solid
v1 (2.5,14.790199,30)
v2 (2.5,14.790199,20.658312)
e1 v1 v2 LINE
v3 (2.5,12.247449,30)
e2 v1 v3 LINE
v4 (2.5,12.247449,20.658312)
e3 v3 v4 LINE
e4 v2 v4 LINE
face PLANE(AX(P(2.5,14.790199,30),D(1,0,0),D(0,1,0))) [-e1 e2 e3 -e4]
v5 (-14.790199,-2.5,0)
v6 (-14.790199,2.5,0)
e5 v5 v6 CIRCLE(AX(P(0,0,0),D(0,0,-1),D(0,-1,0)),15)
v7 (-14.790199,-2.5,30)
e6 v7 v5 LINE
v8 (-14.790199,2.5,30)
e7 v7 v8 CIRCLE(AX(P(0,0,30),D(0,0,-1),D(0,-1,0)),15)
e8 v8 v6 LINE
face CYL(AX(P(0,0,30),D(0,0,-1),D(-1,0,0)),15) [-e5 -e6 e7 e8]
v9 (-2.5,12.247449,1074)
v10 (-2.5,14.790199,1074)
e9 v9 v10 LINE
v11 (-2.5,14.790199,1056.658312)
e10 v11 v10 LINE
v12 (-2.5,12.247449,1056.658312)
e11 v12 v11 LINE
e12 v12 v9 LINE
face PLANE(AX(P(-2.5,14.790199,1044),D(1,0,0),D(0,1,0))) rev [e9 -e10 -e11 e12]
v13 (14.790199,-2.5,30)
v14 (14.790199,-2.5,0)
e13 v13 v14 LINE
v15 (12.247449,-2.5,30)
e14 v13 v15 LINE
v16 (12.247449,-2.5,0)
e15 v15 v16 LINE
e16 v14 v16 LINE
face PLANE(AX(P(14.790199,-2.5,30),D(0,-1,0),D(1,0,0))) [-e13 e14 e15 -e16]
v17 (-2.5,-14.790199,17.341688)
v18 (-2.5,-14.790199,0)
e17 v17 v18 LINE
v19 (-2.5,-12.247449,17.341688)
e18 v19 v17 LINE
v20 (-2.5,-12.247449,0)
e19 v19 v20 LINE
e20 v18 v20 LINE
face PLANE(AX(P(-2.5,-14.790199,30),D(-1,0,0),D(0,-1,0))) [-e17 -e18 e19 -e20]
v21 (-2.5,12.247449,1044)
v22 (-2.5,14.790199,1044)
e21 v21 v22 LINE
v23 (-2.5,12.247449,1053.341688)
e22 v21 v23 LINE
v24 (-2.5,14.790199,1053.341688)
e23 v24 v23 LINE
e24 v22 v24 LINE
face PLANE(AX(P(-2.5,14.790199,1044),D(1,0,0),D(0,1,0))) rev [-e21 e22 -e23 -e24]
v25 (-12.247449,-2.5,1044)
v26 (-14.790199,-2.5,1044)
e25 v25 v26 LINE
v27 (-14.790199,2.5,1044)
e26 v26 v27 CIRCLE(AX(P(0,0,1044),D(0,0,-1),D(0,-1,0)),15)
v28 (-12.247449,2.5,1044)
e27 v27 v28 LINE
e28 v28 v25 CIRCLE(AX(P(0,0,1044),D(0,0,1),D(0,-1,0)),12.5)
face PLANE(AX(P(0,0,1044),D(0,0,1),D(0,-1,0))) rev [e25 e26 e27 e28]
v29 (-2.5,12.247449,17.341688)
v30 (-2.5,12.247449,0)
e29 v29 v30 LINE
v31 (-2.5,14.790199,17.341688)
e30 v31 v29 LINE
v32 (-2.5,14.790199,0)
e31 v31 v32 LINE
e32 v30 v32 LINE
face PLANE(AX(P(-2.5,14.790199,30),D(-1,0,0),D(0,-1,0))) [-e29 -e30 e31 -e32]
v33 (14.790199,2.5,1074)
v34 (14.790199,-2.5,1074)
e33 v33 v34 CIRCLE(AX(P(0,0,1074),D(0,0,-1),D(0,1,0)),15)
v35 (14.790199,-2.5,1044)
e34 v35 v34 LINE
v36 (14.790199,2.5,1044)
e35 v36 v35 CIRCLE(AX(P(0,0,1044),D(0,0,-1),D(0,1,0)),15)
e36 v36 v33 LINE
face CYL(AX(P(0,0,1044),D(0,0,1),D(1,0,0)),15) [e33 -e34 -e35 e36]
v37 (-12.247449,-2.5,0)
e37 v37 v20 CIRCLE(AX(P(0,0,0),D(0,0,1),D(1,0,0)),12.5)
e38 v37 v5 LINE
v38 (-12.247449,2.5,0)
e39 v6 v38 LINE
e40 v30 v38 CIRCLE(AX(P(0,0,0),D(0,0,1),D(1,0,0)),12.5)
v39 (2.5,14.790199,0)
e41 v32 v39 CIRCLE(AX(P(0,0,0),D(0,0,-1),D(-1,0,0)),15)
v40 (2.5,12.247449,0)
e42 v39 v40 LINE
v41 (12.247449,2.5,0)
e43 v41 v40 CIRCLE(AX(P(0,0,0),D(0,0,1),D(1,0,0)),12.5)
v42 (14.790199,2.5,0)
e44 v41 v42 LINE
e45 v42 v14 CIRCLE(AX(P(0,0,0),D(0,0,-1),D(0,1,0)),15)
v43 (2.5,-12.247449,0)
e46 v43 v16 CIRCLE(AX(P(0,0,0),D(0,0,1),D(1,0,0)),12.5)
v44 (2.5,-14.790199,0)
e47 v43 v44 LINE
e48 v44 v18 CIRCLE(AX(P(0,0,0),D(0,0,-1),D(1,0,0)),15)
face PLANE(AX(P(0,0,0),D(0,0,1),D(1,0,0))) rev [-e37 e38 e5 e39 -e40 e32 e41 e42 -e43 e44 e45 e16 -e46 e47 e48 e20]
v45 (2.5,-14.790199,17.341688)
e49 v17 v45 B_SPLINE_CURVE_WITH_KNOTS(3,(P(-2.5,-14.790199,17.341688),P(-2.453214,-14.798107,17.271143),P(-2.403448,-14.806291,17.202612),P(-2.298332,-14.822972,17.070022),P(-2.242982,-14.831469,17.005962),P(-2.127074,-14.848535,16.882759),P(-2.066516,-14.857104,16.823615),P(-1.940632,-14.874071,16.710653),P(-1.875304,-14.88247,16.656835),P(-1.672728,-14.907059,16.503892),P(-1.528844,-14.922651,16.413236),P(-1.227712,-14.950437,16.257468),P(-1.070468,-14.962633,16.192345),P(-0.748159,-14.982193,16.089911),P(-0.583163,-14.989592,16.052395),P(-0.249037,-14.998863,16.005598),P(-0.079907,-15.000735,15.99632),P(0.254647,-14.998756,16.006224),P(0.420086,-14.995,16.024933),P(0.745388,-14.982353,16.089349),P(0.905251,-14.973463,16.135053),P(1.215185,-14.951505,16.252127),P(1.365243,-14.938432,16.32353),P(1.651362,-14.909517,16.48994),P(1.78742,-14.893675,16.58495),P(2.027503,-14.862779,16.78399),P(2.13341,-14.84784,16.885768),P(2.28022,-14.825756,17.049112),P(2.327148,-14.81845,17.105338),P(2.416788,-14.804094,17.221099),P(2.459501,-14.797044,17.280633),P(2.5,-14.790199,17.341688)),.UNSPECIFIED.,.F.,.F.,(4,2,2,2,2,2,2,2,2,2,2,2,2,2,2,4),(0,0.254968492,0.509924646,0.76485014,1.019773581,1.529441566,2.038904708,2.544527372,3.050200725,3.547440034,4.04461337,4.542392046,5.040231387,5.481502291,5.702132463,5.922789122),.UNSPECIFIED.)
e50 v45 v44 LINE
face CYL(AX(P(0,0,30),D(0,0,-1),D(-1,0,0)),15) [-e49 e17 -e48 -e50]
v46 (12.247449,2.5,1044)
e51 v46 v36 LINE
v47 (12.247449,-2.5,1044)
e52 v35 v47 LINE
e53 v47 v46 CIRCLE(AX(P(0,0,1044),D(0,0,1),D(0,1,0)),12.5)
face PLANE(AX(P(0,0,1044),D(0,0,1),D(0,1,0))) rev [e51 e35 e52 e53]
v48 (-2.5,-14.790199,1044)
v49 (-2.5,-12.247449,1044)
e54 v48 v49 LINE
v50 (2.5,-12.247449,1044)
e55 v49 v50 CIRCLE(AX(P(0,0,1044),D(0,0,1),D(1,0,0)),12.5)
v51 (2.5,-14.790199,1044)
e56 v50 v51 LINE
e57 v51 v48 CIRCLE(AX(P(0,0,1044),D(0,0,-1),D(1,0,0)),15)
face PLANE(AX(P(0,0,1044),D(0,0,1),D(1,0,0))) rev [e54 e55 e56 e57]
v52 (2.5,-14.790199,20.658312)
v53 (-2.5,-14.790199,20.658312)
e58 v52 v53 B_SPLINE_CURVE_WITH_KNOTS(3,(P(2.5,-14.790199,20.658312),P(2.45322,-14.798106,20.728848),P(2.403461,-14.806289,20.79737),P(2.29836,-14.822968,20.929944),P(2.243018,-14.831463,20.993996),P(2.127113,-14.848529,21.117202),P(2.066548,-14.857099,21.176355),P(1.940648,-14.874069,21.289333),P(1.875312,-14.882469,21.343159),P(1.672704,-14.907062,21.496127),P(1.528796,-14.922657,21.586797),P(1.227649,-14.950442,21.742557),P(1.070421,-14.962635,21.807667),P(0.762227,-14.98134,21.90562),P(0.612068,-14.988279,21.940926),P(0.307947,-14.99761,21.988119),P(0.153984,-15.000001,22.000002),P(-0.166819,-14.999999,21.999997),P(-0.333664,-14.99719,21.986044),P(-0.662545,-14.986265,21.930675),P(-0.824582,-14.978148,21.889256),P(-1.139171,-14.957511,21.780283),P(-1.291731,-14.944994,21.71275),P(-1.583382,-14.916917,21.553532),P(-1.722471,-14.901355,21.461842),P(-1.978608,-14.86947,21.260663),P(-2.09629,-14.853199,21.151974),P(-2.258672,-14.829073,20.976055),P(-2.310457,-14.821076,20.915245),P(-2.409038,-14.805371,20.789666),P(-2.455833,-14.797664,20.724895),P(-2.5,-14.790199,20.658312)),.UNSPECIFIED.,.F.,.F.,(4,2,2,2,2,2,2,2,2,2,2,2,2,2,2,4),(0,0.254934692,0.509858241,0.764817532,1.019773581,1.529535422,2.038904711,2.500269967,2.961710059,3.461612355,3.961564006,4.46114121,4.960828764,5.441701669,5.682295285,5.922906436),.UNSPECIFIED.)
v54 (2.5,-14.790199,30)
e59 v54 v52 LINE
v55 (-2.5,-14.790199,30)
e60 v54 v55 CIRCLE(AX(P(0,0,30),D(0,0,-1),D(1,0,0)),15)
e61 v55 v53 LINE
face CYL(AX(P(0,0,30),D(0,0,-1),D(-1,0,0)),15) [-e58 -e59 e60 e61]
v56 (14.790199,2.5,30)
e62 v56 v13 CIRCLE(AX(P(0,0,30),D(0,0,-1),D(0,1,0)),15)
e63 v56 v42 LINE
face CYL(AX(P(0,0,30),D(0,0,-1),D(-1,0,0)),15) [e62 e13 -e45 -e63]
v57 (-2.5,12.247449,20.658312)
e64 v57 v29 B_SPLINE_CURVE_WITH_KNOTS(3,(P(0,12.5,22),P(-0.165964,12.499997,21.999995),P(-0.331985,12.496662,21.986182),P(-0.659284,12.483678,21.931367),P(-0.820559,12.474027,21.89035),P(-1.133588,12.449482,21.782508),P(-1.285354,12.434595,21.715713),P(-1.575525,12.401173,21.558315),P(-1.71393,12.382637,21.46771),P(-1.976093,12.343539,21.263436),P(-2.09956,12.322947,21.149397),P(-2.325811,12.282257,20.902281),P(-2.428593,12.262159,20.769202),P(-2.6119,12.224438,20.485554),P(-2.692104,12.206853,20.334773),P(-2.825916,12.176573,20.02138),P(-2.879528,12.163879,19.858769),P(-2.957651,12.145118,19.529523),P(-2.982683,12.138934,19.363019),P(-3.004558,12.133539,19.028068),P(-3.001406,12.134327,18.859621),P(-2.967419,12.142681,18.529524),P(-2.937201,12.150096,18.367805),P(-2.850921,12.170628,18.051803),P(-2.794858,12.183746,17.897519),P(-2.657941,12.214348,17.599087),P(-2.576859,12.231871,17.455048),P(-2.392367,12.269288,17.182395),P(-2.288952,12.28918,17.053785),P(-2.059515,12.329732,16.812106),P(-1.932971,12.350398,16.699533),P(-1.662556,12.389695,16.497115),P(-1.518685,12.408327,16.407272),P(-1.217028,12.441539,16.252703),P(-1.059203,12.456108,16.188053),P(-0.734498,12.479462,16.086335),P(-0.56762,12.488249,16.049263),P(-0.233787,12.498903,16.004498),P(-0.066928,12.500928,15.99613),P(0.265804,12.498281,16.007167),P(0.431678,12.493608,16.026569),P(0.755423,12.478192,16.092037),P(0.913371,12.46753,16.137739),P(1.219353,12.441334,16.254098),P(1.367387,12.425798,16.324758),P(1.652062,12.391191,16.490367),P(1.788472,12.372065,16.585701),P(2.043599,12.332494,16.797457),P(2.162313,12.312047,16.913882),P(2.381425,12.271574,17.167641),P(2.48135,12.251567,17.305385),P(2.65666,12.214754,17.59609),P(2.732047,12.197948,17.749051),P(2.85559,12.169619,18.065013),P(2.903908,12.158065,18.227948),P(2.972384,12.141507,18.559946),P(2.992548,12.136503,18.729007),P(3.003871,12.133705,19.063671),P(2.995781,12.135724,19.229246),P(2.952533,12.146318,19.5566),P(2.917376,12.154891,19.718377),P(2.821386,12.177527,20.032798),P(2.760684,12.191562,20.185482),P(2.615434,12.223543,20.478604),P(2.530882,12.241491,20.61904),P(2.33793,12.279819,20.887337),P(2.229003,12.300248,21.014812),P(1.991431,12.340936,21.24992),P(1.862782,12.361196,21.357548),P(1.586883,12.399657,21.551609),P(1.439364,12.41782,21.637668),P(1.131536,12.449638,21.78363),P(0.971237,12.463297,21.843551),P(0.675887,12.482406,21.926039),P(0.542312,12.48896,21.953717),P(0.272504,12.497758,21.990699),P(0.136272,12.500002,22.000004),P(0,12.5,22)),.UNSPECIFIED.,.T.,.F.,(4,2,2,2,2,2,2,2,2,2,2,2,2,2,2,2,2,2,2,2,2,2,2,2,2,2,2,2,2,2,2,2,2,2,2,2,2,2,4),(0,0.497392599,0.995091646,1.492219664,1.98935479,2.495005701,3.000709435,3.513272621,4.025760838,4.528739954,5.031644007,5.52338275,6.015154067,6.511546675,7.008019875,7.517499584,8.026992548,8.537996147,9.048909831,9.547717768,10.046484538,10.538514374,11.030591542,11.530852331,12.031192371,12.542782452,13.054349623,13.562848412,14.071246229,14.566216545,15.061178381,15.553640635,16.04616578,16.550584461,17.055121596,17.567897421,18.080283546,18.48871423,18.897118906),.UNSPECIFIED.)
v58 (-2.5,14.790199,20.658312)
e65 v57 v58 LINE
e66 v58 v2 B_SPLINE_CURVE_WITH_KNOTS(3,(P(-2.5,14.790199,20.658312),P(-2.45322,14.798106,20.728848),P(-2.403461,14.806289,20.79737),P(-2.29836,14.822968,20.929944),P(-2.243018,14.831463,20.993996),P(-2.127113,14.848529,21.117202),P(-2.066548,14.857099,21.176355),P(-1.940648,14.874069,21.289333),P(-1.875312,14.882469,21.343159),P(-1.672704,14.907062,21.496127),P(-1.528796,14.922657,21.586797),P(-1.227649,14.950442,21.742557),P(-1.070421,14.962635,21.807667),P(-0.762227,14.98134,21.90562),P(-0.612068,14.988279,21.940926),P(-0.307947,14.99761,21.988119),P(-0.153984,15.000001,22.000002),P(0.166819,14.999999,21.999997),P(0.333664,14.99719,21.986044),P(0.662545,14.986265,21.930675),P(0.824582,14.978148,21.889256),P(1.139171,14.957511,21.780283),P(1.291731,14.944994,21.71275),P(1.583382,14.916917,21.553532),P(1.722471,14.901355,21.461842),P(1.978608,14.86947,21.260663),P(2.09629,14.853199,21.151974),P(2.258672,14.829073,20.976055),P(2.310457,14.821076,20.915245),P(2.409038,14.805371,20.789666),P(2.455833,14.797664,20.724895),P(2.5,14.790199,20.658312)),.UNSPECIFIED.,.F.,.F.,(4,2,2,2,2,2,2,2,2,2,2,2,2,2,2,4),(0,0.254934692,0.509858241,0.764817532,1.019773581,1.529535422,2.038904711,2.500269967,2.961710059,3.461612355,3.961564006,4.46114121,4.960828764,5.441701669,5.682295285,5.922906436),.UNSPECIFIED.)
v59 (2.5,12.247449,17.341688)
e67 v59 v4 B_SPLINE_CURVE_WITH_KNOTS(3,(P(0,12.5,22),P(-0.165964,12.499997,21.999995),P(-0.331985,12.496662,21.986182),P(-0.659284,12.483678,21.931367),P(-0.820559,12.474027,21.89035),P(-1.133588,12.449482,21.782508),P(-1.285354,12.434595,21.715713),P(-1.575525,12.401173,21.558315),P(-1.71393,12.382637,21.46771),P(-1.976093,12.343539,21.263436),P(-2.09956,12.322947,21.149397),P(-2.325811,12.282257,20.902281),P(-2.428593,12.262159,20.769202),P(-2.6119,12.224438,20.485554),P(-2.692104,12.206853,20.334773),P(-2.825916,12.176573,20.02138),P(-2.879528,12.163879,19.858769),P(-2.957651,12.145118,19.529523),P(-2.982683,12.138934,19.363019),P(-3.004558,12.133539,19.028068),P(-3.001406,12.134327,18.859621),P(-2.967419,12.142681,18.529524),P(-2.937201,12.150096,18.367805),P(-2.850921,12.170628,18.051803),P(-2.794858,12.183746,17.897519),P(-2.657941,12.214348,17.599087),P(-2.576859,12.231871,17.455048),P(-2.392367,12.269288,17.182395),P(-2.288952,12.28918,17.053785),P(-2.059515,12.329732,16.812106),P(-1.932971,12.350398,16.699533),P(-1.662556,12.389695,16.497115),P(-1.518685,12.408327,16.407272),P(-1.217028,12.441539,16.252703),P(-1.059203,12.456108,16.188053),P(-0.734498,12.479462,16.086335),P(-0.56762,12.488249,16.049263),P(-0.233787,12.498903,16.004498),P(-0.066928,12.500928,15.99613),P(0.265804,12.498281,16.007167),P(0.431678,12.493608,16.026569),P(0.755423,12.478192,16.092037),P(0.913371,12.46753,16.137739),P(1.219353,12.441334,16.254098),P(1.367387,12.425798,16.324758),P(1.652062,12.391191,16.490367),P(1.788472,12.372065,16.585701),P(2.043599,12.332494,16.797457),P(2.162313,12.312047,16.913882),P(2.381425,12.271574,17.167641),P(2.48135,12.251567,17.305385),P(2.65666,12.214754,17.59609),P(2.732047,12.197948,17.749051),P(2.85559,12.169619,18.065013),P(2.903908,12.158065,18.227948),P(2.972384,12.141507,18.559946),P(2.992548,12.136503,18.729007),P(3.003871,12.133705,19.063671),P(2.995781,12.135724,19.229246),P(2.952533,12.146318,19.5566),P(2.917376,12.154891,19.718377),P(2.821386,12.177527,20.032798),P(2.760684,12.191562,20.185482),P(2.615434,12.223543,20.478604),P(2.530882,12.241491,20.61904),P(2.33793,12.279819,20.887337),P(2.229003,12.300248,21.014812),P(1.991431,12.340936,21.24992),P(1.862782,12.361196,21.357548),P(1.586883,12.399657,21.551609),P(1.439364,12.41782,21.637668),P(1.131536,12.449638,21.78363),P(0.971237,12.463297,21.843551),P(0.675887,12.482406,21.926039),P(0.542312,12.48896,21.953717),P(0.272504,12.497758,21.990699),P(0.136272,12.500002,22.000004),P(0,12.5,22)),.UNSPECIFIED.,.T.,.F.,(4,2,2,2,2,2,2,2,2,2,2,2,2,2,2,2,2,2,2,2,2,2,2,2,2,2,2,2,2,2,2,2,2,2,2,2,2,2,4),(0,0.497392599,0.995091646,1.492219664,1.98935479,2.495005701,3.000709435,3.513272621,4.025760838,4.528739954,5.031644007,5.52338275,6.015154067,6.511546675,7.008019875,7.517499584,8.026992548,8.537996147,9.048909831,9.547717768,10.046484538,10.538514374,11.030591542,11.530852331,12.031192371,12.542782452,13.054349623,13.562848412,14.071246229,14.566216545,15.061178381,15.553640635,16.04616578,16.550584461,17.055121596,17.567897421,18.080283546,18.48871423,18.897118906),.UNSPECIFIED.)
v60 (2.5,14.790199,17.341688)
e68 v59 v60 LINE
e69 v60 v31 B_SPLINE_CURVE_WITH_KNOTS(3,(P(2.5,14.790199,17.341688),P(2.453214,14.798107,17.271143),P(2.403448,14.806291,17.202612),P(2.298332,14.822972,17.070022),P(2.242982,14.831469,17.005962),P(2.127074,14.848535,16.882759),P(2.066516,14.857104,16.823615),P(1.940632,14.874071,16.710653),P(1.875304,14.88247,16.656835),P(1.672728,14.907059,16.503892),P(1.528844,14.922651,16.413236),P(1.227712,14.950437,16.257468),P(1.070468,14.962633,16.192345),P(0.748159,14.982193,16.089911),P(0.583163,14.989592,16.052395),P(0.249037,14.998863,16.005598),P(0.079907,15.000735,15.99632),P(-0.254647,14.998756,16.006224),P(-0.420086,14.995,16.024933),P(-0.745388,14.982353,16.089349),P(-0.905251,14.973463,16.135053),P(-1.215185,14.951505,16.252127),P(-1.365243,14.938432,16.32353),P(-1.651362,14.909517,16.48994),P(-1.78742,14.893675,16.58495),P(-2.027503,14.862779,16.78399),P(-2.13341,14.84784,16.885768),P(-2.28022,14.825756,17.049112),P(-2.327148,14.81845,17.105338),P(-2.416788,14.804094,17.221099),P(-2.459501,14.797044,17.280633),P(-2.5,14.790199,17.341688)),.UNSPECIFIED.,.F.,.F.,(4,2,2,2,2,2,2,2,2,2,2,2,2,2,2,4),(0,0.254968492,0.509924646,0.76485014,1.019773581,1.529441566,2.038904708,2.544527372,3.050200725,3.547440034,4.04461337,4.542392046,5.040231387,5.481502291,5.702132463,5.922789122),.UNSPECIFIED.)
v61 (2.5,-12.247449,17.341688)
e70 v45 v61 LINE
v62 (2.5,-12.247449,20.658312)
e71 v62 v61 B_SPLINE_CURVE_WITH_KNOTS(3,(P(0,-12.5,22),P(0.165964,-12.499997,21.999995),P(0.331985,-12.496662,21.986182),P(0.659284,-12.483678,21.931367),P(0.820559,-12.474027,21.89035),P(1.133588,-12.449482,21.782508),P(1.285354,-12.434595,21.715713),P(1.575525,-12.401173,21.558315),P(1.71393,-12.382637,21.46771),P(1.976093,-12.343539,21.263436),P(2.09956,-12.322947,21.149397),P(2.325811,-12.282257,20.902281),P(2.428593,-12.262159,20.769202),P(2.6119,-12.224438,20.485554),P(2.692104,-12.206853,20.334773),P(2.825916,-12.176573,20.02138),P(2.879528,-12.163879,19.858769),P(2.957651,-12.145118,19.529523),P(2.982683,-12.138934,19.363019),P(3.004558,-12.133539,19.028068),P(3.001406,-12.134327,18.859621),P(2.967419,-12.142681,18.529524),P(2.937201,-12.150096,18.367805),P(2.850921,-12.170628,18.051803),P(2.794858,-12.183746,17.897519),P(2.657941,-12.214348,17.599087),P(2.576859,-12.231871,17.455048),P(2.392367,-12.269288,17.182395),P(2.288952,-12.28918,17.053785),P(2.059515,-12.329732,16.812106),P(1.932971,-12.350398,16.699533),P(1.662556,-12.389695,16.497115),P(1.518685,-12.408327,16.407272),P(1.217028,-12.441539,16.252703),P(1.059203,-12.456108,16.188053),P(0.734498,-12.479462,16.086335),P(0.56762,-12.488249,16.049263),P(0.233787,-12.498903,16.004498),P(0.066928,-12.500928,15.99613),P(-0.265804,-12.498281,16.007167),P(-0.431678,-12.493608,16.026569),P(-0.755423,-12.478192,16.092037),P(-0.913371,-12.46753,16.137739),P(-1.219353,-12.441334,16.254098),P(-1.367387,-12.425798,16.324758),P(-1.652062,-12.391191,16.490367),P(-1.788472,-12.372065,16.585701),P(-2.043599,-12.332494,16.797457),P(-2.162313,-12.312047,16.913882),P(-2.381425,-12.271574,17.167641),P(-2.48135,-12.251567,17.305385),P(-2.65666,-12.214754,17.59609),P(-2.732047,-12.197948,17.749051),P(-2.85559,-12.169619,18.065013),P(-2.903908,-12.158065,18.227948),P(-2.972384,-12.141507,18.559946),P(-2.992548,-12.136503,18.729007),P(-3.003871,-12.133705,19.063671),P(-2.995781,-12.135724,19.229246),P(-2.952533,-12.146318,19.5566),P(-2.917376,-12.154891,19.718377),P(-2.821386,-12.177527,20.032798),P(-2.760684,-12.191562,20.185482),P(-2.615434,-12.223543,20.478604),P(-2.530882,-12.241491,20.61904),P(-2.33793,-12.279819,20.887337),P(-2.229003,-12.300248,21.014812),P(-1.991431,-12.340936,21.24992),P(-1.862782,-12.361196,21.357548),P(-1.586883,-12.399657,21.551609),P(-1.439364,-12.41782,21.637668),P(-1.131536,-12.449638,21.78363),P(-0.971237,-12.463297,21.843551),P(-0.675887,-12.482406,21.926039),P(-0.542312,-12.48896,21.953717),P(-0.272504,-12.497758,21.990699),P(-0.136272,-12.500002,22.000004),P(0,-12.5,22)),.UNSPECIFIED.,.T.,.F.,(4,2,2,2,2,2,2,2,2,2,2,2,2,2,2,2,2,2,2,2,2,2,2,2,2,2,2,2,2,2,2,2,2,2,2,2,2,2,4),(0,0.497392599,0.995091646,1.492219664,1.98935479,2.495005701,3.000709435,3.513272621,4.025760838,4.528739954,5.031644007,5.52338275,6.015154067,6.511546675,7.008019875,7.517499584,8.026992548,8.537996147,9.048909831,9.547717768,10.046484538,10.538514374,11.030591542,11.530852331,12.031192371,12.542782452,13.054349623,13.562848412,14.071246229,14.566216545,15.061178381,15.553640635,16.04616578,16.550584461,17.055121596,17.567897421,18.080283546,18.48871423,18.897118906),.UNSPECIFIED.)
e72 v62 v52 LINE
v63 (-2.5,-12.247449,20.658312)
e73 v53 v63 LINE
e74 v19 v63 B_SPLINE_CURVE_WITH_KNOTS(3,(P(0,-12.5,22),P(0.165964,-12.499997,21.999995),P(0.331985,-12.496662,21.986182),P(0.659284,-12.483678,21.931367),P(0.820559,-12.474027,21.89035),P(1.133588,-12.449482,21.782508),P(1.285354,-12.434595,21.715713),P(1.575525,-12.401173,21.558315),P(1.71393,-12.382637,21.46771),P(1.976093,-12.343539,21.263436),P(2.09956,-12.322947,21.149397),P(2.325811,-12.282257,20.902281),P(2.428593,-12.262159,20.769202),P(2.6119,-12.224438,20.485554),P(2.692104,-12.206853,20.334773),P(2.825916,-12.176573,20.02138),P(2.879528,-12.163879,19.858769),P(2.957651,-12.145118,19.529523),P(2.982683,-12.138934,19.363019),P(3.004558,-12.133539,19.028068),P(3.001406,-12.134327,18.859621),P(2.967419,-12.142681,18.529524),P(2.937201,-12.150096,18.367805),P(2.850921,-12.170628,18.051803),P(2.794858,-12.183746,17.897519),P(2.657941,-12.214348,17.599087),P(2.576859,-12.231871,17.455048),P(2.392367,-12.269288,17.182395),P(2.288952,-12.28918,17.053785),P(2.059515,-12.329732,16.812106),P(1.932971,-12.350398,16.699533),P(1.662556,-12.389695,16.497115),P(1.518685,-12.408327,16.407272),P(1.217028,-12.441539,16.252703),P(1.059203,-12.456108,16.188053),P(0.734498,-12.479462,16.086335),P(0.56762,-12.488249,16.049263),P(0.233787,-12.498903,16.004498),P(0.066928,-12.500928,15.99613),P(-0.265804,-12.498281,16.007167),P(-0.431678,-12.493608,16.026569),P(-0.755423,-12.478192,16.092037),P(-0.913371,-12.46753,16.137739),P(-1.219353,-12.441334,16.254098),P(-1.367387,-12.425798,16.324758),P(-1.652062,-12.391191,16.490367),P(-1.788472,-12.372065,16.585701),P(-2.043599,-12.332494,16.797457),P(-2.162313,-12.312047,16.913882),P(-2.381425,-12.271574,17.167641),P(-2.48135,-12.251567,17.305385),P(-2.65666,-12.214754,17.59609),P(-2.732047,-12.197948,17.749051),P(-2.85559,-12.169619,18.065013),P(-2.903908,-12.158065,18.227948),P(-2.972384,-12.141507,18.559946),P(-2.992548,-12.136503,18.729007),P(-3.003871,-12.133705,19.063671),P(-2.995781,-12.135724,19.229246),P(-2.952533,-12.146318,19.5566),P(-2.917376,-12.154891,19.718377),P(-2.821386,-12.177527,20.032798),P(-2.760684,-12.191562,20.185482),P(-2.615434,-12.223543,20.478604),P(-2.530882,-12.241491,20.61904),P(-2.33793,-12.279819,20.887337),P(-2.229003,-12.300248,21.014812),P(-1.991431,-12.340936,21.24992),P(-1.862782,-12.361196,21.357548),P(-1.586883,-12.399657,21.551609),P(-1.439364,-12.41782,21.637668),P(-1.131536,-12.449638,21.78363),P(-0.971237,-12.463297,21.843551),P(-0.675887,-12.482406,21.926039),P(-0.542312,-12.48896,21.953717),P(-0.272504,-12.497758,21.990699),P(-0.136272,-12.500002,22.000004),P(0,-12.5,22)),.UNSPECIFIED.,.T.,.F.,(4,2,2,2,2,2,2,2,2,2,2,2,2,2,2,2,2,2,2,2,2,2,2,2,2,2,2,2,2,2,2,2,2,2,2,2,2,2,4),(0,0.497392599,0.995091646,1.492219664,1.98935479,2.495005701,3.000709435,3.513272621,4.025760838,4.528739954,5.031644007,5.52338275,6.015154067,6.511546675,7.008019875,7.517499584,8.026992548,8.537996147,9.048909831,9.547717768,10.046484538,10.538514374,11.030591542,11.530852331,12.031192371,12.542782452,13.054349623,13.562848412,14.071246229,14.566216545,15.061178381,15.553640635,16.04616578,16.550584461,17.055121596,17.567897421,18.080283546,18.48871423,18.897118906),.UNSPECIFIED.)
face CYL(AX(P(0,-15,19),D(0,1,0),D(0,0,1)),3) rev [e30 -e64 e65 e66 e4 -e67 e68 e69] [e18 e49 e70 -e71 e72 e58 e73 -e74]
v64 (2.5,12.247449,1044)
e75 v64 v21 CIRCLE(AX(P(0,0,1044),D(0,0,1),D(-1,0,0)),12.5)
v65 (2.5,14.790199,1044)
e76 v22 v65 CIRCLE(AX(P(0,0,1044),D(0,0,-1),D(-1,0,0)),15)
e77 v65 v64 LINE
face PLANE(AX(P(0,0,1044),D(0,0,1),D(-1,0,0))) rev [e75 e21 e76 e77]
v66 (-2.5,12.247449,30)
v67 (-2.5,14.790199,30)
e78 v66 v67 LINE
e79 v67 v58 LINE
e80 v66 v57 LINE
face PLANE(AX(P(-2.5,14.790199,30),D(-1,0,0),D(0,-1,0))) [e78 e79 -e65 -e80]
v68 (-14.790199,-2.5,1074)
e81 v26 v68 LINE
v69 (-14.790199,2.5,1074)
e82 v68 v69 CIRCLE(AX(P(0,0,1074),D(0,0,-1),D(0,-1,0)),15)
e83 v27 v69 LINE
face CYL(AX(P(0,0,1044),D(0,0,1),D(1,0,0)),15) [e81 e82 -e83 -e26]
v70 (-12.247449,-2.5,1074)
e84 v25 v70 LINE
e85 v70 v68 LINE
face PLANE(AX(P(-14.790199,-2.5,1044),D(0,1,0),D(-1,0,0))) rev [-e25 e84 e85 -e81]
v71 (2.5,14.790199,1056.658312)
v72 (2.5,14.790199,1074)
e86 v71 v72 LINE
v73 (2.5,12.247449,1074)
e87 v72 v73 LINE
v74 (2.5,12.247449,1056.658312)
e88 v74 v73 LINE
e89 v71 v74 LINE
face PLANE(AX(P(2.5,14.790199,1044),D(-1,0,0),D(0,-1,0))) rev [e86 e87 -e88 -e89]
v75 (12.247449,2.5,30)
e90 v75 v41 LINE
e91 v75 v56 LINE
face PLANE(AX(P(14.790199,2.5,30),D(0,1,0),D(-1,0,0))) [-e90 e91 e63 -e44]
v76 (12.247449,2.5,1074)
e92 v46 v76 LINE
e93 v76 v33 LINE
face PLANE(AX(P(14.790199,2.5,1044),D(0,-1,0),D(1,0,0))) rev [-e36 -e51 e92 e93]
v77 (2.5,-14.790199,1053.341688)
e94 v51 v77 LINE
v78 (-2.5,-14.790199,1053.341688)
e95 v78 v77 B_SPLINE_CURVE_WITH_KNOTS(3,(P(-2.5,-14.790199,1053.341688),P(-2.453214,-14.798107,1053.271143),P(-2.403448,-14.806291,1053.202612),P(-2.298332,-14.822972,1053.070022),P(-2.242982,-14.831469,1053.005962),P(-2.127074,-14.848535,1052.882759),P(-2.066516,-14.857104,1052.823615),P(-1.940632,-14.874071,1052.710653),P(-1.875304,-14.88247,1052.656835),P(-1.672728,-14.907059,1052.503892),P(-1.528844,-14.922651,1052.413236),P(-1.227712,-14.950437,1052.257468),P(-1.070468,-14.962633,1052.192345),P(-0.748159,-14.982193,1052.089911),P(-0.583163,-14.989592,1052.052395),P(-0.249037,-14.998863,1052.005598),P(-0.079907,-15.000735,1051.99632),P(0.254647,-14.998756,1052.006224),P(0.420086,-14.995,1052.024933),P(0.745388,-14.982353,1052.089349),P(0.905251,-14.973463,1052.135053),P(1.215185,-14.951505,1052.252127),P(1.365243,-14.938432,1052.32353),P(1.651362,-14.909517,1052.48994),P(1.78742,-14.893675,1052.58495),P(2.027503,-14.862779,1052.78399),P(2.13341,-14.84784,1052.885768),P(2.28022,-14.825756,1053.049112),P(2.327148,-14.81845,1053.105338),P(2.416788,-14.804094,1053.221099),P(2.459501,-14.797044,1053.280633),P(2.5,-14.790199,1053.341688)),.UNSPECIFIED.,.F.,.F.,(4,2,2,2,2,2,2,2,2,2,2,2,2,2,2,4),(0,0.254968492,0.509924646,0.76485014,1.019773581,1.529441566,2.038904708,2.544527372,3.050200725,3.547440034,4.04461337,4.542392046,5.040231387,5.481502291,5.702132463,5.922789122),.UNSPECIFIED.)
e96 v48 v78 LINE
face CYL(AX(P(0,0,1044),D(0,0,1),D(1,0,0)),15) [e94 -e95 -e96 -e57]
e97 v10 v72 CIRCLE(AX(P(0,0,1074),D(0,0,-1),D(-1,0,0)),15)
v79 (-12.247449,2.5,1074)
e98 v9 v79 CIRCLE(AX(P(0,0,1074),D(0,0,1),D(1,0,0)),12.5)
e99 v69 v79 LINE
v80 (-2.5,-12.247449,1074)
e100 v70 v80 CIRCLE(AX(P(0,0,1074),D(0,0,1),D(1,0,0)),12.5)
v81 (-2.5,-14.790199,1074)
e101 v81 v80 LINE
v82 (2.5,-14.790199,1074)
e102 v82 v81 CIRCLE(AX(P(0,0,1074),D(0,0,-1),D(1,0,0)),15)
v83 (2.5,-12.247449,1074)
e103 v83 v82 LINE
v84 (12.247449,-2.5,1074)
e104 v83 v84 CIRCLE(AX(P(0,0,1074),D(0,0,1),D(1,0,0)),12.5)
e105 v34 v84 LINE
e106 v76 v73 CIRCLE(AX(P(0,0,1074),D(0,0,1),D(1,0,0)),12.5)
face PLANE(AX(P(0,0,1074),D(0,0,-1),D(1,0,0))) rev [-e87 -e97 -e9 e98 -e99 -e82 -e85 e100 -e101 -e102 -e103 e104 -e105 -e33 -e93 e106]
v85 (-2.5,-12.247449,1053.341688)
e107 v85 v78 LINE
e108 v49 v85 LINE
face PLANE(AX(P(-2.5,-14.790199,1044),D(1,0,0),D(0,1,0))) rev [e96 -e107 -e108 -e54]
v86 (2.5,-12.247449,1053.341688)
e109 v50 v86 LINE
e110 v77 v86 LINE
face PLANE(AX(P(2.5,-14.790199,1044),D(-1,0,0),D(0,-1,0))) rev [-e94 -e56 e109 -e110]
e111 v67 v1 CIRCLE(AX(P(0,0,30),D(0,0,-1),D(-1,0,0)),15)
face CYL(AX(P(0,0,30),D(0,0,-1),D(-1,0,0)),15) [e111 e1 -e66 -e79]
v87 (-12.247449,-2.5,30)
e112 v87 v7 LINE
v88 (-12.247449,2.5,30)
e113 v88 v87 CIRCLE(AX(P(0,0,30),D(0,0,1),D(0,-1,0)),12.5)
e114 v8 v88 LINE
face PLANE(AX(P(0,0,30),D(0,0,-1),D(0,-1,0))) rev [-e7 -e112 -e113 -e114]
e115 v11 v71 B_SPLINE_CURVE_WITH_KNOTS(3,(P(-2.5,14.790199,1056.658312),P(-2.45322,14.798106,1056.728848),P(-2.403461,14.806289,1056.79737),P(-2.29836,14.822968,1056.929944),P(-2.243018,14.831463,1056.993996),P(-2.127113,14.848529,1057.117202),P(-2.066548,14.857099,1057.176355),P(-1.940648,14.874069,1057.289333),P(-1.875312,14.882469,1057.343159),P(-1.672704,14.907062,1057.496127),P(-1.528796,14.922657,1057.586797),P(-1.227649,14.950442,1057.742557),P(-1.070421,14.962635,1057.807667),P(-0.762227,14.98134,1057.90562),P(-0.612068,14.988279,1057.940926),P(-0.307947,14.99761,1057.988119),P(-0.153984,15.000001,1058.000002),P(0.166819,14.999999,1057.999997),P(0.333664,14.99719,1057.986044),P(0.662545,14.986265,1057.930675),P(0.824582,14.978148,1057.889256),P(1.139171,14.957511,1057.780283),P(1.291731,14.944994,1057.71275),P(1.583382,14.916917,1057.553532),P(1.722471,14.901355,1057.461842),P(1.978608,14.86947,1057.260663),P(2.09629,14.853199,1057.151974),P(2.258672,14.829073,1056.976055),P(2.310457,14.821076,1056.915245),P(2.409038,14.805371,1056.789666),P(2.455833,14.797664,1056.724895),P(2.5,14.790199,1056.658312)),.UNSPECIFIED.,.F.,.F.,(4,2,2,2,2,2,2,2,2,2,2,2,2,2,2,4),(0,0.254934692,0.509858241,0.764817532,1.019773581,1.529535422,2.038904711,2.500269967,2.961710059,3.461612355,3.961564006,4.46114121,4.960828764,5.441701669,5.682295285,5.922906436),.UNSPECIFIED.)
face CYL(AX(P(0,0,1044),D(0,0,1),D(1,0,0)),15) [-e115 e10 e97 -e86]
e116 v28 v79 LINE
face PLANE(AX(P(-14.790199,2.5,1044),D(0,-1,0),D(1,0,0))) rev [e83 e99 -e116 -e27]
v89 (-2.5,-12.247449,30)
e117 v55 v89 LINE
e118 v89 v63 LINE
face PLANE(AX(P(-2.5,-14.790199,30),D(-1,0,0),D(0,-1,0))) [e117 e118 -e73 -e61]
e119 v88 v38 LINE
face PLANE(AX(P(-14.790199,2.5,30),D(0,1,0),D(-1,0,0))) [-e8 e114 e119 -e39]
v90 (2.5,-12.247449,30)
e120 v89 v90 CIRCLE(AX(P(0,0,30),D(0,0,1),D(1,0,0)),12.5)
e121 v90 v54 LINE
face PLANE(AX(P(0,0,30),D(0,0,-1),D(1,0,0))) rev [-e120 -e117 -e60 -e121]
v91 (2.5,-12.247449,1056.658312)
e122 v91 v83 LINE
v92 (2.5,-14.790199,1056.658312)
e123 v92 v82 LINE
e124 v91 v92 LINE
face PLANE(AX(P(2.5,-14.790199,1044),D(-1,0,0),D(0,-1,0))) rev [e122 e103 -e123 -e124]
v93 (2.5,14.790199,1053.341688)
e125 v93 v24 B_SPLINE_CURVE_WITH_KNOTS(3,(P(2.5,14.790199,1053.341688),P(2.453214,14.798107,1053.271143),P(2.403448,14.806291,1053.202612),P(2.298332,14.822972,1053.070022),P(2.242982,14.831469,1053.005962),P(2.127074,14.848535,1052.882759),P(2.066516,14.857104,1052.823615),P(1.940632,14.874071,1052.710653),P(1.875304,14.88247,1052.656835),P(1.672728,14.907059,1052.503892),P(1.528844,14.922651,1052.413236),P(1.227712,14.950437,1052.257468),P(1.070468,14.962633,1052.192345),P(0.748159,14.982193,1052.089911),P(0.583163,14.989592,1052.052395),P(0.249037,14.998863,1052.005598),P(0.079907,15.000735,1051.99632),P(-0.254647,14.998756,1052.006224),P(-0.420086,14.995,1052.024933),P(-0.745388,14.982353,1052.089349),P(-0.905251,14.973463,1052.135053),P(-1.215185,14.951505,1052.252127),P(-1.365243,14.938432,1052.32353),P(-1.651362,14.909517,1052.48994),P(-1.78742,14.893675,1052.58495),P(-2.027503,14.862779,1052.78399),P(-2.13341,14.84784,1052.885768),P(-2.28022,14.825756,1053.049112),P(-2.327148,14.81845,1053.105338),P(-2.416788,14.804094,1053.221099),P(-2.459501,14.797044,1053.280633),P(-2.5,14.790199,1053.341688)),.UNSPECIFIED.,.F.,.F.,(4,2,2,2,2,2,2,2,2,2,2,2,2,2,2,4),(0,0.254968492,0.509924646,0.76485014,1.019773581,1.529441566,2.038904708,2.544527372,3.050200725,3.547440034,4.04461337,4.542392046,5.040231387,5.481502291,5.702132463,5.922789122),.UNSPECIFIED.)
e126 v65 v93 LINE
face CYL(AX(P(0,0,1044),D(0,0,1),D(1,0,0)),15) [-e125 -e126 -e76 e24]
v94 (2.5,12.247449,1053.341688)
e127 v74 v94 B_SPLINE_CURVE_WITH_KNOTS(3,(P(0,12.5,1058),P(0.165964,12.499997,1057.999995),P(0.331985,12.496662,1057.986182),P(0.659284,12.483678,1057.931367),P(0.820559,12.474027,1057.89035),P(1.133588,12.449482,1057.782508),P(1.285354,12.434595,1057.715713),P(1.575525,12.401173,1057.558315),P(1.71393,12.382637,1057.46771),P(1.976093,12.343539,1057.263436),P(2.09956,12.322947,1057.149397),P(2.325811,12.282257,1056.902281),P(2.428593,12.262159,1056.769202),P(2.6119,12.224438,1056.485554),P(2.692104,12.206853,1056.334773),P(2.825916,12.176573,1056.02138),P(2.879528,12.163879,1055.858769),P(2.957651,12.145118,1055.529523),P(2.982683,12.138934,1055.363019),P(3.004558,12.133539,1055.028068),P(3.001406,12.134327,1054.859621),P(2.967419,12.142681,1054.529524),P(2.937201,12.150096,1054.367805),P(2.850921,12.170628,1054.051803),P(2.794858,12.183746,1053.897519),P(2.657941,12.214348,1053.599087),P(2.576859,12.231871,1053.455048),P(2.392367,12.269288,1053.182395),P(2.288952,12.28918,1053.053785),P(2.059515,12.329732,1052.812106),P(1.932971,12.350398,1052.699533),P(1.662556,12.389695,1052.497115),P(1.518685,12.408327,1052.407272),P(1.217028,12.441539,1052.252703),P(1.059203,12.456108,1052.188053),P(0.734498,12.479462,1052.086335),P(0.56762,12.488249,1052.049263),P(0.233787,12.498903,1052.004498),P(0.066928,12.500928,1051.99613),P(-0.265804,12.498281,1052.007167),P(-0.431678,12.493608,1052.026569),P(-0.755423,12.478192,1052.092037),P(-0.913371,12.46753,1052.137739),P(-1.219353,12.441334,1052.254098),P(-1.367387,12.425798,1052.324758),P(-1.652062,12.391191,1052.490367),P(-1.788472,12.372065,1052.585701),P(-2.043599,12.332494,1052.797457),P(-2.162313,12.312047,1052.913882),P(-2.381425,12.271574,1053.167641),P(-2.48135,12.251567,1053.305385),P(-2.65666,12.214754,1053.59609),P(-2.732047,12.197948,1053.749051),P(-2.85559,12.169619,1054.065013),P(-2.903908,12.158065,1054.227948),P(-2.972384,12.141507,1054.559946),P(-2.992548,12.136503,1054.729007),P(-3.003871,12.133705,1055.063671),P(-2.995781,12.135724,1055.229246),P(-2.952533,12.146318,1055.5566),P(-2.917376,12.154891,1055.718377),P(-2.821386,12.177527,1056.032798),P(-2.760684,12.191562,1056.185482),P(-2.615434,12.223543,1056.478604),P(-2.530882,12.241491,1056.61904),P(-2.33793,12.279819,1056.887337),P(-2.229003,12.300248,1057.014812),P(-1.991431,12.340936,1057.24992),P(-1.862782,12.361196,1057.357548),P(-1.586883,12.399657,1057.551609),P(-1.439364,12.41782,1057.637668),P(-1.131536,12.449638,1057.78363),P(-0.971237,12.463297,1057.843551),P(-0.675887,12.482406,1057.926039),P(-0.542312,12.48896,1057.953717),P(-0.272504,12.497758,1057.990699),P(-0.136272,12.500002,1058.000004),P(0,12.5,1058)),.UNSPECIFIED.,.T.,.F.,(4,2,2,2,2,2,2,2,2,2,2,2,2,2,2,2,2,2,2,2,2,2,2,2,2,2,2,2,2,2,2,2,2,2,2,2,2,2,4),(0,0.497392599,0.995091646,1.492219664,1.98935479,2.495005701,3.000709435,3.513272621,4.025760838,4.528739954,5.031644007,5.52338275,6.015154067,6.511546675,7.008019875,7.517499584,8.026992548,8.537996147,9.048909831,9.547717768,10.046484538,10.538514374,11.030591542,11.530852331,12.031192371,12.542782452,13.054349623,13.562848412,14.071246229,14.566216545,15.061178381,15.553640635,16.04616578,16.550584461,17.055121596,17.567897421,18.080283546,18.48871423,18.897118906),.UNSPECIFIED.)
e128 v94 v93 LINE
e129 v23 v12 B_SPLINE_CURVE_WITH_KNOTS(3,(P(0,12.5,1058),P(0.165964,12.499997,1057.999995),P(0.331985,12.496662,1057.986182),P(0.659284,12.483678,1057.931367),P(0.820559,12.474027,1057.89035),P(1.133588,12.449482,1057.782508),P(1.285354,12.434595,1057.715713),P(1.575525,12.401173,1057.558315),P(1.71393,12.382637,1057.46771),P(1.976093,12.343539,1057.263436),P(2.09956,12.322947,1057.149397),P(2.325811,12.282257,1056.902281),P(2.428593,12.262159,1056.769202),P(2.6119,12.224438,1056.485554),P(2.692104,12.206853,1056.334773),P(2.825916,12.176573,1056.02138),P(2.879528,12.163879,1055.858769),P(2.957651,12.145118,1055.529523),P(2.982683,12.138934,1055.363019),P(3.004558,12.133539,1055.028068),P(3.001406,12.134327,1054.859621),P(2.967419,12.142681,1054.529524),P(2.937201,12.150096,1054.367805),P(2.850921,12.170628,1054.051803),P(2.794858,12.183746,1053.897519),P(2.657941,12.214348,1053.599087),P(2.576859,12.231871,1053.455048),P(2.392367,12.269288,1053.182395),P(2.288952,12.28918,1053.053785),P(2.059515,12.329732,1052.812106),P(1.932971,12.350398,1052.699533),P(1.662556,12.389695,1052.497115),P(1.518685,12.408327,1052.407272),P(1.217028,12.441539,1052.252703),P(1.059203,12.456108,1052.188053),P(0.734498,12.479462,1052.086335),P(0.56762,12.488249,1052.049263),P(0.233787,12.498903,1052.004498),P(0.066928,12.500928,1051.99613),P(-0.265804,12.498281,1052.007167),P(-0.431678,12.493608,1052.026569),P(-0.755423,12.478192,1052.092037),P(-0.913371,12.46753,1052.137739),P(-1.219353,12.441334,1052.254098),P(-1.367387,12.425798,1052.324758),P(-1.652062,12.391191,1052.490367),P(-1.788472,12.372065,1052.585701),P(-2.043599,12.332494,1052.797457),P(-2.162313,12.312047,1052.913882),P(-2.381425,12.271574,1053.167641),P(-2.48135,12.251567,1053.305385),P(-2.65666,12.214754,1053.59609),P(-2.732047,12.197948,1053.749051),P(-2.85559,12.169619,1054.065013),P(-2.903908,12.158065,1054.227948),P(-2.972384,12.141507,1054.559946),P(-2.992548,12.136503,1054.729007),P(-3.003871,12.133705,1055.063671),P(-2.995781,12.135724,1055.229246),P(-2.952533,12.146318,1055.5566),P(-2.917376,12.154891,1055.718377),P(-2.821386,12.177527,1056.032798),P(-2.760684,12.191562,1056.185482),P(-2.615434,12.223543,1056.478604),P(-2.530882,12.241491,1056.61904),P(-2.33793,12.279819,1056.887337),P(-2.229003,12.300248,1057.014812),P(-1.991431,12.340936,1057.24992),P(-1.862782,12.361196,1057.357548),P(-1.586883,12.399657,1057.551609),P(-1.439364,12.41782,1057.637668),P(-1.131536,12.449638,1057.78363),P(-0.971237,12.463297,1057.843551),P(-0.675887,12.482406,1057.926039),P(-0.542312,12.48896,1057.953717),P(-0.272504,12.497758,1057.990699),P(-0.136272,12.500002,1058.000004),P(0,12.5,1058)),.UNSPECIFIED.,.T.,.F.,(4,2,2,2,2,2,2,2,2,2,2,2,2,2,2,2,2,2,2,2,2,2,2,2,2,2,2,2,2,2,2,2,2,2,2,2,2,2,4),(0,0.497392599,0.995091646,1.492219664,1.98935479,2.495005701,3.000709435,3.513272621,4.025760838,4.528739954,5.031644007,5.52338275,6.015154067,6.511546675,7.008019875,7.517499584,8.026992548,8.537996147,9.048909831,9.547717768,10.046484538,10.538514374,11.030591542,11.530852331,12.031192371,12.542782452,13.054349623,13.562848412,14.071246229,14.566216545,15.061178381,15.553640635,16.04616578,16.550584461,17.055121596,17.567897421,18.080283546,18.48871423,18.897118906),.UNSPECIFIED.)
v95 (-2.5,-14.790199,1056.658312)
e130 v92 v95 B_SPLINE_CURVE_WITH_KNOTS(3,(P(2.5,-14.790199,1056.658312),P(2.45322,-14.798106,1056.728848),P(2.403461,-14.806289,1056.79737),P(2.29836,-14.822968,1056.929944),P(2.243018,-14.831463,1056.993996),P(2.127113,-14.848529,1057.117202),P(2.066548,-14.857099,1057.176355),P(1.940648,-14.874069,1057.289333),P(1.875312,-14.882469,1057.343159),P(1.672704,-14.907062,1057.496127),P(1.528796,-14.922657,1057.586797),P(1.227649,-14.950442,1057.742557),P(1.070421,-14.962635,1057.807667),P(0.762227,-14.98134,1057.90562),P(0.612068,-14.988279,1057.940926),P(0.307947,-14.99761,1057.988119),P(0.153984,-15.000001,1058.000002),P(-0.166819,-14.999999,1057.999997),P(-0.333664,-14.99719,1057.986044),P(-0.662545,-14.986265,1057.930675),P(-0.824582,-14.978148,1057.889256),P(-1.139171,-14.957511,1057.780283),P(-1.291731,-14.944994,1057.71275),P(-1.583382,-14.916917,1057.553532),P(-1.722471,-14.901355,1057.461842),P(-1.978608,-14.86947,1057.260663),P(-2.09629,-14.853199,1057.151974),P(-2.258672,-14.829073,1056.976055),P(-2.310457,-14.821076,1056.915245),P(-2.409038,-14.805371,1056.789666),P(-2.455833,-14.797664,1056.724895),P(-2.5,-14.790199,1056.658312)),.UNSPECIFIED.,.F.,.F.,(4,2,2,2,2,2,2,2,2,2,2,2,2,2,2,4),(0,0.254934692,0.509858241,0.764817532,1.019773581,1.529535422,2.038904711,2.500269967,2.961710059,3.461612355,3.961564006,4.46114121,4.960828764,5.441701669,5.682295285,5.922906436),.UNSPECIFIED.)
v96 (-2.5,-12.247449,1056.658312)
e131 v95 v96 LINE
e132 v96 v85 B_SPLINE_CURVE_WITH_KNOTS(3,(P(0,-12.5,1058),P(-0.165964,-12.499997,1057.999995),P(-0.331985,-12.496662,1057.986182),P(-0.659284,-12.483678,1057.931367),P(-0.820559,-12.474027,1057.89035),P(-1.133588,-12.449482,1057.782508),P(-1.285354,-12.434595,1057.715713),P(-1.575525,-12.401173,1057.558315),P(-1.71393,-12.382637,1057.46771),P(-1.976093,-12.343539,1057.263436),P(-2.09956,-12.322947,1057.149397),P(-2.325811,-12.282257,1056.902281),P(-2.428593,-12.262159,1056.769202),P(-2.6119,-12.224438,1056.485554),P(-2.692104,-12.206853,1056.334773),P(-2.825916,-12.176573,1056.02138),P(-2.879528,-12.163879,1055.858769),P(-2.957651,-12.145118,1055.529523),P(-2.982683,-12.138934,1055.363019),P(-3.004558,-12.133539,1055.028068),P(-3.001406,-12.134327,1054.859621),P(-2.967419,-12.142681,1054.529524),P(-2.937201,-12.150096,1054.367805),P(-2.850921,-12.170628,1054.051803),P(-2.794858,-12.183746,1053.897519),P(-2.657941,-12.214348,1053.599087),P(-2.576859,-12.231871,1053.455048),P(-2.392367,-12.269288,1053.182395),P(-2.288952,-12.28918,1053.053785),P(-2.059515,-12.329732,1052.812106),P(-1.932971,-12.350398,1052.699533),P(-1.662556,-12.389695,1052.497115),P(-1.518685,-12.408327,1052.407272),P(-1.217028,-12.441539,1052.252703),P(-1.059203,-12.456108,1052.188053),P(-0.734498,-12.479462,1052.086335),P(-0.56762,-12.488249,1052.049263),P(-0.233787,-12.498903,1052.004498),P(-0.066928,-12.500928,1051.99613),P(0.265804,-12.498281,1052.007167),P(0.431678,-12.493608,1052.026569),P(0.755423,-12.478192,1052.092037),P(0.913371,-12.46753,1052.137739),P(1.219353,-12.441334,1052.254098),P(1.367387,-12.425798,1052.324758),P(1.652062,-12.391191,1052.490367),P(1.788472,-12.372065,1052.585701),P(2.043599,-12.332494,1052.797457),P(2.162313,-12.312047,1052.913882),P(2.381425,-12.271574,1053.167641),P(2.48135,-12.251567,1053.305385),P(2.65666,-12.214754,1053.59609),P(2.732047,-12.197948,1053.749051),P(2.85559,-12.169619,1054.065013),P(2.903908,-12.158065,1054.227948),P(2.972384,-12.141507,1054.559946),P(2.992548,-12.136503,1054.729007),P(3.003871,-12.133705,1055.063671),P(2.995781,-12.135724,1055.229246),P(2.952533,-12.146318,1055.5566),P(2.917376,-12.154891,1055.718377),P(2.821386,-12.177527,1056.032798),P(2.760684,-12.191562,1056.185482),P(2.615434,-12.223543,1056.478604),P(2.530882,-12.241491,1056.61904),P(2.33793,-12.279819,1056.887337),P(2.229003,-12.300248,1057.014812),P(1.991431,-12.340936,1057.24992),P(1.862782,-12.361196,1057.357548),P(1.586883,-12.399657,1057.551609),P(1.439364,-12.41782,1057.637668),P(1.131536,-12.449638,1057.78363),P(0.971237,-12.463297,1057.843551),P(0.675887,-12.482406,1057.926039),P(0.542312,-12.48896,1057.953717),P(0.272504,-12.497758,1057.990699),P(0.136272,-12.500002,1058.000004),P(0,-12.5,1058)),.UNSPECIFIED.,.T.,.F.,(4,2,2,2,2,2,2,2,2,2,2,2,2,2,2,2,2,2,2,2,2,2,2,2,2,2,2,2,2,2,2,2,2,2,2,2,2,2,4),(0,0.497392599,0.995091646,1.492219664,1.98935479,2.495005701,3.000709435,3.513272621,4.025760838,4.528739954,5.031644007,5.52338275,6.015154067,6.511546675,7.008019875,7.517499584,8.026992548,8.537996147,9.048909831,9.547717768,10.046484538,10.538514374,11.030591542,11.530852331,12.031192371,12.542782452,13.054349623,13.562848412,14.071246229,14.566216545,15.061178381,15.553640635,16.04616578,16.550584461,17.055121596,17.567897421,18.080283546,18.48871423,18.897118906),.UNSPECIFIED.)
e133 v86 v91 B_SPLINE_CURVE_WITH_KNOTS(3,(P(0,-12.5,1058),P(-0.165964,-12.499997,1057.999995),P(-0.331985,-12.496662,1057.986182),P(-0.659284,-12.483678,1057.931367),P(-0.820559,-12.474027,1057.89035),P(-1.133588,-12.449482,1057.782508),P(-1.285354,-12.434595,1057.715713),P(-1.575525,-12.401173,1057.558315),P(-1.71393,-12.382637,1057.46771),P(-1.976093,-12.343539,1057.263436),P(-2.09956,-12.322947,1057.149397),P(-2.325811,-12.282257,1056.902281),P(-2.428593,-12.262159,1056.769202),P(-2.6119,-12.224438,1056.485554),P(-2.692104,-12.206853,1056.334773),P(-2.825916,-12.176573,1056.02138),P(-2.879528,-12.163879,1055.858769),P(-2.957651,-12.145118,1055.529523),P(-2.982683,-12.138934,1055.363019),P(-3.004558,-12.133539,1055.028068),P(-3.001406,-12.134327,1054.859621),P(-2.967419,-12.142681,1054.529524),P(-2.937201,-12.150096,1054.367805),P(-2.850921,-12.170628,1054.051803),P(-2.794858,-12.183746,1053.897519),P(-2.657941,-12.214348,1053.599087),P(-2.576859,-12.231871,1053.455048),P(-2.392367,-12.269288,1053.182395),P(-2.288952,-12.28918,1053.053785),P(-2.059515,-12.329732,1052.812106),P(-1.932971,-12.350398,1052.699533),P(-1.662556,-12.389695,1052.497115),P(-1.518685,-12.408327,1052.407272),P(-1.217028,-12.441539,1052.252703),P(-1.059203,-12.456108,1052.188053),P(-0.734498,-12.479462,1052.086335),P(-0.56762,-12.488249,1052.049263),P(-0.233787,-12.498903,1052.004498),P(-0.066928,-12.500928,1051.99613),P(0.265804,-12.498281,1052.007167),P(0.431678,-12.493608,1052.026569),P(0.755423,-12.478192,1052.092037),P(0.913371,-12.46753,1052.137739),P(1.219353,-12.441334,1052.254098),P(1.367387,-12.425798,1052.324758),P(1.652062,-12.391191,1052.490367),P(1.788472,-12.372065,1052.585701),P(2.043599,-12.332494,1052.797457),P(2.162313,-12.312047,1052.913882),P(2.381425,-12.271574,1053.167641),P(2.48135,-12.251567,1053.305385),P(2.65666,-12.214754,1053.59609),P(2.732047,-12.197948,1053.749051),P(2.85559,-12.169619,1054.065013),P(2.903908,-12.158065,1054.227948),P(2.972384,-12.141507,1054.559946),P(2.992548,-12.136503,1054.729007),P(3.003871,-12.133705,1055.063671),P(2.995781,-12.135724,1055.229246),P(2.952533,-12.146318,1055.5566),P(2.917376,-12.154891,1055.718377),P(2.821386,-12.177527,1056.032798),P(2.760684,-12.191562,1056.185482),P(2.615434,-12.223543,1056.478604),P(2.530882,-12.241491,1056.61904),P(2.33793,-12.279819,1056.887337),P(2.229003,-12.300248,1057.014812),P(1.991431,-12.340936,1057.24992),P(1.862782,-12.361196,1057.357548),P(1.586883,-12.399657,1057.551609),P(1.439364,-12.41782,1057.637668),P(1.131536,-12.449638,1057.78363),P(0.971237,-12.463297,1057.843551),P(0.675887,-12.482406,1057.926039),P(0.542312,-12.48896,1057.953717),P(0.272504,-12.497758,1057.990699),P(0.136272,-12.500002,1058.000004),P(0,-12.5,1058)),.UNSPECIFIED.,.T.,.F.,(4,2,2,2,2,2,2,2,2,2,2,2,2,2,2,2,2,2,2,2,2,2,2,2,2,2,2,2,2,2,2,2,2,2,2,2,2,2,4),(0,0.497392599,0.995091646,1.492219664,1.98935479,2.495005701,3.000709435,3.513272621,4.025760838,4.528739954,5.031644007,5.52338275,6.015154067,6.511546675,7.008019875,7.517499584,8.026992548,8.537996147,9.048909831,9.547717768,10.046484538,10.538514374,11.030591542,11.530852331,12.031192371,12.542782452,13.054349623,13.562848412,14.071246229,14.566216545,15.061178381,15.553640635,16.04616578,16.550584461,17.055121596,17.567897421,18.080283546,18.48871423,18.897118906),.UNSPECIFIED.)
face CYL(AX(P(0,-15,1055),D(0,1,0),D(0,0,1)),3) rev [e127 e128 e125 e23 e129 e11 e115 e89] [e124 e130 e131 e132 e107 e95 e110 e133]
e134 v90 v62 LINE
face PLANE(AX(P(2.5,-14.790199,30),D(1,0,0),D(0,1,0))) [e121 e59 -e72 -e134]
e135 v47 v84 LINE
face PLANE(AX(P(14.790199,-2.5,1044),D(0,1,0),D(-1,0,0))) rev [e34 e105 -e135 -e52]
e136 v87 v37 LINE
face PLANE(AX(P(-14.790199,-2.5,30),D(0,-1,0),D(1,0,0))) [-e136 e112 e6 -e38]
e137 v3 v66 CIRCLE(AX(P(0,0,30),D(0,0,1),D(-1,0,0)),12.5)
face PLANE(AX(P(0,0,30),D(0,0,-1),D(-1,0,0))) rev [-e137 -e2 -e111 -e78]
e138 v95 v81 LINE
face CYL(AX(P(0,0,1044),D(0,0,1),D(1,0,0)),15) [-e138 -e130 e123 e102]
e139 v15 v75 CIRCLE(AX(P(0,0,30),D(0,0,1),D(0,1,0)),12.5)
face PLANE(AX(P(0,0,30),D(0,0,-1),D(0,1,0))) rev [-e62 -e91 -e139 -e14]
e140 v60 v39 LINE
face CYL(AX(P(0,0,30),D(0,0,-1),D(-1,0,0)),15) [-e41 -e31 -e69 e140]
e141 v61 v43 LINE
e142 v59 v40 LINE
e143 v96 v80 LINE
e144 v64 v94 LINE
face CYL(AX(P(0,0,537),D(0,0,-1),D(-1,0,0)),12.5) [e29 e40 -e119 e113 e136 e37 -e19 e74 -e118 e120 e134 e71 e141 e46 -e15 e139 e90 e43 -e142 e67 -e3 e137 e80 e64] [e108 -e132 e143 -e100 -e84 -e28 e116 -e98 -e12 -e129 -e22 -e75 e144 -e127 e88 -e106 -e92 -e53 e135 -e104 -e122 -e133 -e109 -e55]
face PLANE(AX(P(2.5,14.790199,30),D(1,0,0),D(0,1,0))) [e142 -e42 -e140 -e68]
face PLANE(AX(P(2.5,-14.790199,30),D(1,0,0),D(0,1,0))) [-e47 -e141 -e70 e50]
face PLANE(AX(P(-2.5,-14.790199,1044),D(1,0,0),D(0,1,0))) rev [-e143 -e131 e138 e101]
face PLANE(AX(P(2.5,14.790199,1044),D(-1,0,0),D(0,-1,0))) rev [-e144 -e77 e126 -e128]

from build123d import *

# Parameters (mm, degrees)
SKETCH1_R           = 12.5
BOSS_EXTRUDE1_DEPTH = 537
BOSS_EXTRUDE2_DEPTH = 30
CIRPATTERN1_COUNT   = 4
SKETCH4_R           = 3
CUT_EXTRUDE1_DEPTH  = 538.418831081


# Read off the part's stored shape, not the designer's step: Mirror1
with BuildPart() as part:
    # Sketch1 → Boss-Extrude1 (new body)
    with BuildSketch(Plane.XY):
        Circle(SKETCH1_R)
    extrude(amount=BOSS_EXTRUDE1_DEPTH)

    # Sketch3 → Boss-Extrude2 (add)
    with BuildSketch(Plane(origin=(0, 0, 0), x_dir=(-1, 0, 0), z_dir=(0, 0, -1))):
        with BuildLine():
            Line((-2.5, 14.790199458), (-2.5, 12.247448714))
            ThreePointArc((-2.5, 12.247448714), (0, 12.5), (2.5, 12.247448714))
            Line((2.5, 12.247448714), (2.5, 14.790199458))
            ThreePointArc((2.5, 14.790199458), (0, 15), (-2.5, 14.790199458))
        make_face()
    boss_extrude2 = extrude(amount=-BOSS_EXTRUDE2_DEPTH)

    # CirPattern1: Boss-Extrude2 ×4 about axis
    cirpattern1_axis = Axis((0, 0, 0), (0, 0, 1))
    for i in range(1, CIRPATTERN1_COUNT):
        add(boss_extrude2.rotate(cirpattern1_axis, i * 360 / CIRPATTERN1_COUNT))

    # Sketch4 → Cut-Extrude1 (cut, symmetric)
    with BuildSketch(Plane(origin=(0, 0, 0), x_dir=(1, 0, 0), z_dir=(0, 1, 0))):
        with Locations(Location((0, -19, 0), (0, 0, 213.557309762))):
            Circle(SKETCH4_R)
    extrude(amount=CUT_EXTRUDE1_DEPTH, both=True, mode=Mode.SUBTRACT)

    # Mirror1: part across plane


with BuildPart() as part_1:
    add(part.part)
    add(part.part.mirror(Plane.XY.offset(537)))


solid = part_1.part
